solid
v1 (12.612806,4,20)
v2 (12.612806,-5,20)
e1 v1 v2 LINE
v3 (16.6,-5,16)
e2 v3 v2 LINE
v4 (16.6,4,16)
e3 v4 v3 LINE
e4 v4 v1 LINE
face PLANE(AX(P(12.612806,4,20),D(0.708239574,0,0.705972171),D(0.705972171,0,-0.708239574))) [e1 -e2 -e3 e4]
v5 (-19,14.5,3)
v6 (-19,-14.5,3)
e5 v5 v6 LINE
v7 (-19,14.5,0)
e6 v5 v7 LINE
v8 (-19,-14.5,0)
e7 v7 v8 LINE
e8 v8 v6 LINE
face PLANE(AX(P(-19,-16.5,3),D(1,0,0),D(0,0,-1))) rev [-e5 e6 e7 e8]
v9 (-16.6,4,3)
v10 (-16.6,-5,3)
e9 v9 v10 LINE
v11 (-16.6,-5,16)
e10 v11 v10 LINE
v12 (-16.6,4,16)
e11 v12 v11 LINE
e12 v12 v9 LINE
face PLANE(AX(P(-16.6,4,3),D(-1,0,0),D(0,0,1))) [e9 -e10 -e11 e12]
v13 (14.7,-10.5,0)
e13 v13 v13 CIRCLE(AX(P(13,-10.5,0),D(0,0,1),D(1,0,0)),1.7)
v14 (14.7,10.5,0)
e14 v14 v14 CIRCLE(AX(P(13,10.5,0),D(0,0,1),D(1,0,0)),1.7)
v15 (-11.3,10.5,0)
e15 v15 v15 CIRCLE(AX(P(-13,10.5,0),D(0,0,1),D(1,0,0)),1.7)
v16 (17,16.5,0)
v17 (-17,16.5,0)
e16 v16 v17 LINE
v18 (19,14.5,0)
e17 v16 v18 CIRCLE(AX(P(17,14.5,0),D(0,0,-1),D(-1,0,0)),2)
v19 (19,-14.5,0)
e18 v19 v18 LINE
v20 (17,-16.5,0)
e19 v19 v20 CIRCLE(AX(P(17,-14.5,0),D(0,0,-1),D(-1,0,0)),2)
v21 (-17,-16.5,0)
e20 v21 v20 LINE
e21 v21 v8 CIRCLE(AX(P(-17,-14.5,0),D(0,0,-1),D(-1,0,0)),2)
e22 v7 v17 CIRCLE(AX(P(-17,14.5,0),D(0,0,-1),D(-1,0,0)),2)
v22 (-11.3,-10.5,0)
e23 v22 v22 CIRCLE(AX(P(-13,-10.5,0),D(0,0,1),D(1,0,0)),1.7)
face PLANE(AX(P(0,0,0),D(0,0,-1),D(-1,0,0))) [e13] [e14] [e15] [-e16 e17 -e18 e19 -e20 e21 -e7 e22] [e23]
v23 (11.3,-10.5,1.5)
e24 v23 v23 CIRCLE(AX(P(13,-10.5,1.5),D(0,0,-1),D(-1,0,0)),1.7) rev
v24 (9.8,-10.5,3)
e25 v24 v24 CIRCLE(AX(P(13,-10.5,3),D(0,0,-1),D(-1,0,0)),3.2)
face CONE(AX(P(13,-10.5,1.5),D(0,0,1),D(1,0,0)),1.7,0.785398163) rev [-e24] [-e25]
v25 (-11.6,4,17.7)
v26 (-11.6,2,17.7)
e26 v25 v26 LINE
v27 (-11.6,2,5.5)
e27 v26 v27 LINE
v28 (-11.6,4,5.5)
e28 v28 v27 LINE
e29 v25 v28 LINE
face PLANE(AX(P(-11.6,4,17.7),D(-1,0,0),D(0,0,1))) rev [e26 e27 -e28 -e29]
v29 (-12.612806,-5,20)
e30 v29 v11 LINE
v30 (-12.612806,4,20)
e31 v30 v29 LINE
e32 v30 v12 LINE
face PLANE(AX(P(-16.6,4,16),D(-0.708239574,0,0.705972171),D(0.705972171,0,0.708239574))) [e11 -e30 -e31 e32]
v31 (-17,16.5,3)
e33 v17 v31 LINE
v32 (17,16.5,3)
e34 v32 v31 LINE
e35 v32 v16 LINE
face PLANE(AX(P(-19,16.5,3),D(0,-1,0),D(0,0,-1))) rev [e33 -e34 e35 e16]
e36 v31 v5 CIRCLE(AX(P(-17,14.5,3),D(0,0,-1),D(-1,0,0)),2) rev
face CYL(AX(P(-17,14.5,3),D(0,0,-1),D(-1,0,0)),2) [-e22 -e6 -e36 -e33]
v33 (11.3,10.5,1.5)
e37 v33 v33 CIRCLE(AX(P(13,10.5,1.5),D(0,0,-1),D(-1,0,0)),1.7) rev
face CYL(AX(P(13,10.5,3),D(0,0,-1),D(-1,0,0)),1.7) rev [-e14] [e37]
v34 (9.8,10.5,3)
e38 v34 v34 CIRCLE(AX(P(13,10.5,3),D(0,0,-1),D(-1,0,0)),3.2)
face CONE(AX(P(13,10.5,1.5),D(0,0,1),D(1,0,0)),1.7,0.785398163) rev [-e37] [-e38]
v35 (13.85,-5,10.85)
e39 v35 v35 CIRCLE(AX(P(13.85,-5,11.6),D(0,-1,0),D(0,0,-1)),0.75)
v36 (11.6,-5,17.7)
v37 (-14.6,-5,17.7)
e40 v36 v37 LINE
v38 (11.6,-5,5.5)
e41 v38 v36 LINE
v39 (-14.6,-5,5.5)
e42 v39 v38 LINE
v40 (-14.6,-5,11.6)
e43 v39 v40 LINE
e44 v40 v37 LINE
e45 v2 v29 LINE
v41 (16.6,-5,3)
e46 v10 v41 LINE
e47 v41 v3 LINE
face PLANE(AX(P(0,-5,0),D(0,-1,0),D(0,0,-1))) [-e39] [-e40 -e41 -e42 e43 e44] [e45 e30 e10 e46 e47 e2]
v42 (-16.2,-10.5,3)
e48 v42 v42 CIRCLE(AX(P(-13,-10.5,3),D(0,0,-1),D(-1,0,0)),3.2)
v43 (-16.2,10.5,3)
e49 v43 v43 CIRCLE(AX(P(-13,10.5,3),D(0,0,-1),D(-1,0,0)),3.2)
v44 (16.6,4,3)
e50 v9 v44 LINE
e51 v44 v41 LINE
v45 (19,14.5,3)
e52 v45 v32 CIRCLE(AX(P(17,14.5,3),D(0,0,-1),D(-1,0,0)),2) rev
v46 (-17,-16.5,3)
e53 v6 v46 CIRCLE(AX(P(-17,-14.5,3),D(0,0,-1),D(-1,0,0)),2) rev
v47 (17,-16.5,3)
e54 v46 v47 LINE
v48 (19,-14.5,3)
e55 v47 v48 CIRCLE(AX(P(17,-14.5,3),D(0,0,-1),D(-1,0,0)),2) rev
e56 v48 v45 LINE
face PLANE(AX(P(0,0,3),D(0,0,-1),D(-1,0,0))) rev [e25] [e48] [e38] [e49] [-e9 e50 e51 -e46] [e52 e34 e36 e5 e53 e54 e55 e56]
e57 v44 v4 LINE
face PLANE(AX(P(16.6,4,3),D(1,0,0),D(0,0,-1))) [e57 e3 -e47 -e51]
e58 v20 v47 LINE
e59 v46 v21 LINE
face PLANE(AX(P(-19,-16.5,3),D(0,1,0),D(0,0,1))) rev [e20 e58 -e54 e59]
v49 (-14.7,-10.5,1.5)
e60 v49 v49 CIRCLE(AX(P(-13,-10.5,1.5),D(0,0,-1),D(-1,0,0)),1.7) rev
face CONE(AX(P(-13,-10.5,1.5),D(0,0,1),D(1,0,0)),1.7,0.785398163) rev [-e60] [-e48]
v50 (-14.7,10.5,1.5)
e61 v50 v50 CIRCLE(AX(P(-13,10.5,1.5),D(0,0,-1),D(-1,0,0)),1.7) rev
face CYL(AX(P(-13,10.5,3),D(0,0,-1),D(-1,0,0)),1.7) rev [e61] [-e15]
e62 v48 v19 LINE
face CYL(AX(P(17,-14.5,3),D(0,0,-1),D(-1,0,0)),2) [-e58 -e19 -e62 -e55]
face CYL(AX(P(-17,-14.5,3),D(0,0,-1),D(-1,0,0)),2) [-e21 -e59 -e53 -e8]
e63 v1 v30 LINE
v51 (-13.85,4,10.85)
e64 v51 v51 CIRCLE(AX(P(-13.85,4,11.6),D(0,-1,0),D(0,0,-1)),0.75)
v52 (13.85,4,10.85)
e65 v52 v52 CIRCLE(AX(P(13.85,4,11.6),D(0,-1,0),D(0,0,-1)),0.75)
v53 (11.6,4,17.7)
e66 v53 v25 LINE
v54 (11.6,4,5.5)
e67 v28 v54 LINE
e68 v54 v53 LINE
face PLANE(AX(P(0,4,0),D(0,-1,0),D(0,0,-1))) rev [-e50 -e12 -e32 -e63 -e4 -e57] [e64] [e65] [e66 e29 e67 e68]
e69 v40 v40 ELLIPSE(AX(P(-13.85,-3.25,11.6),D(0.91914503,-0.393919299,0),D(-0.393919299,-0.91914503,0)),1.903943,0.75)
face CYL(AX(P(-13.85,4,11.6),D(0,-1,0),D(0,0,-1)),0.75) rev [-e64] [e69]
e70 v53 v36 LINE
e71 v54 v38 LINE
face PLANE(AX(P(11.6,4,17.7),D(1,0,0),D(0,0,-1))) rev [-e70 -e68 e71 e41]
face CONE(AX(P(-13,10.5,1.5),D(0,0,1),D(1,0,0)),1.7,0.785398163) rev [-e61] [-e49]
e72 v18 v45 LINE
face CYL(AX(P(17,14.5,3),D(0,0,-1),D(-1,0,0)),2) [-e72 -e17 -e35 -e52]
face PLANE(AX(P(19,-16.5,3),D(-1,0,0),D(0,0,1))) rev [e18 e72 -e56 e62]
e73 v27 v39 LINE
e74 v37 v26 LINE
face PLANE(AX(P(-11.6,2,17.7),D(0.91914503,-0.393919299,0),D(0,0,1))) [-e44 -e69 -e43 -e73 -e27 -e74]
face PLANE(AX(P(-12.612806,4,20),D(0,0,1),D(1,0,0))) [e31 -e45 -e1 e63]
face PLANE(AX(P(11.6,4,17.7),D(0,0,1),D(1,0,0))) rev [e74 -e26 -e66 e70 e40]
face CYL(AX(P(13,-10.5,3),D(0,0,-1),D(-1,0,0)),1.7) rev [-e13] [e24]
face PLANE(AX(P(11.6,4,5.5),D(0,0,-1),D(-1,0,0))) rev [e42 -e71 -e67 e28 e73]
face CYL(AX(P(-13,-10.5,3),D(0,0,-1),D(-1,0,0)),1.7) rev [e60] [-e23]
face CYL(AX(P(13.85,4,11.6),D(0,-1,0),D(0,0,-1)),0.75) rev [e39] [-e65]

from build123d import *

# Parameters (mm, degrees)
SKETCH1_W                = 38
SKETCH1_H                = 33
SKETCH1_R                = 1.7
BOSS_EXTRUDE1_DEPTH      = 3
BOSS_EXTRUDE2_DEPTH      = 5
BOSS_EXTRUDE2_DEPTH_BACK = 4
SKETCH3_R                = 0.75
SKETCH3_W                = 23.2
SKETCH3_H                = 12.2
FILLET1_R                = 2
CHAMFER1_SIZE            = 1.5
CHAMFER2_SIZE            = 3
CHAMFER2_SIZE_2          = 7


with BuildPart() as part:
    # Sketch1 → Boss-Extrude1 (new body)
    with BuildSketch(Plane.XY):
        Rectangle(SKETCH1_W, SKETCH1_H)
        with Locations((-13, 10.5)):
            Circle(SKETCH1_R, mode=Mode.SUBTRACT)
        with Locations((13, 10.5)):
            Circle(SKETCH1_R, mode=Mode.SUBTRACT)
        with Locations((13, -10.5)):
            Circle(SKETCH1_R, mode=Mode.SUBTRACT)
        with Locations((-13, -10.5)):
            Circle(SKETCH1_R, mode=Mode.SUBTRACT)
    extrude(amount=BOSS_EXTRUDE1_DEPTH)

    # Sketch3 → Boss-Extrude2 (add, two sides: drawn at the far end of the back side and taken through both)
    with BuildSketch(Plane(origin=(0, 0, 0), x_dir=(-1, 0, 0), z_dir=(0, -1, 0)).offset(-BOSS_EXTRUDE2_DEPTH_BACK)):
        Polygon((16.6, -3), (16.6, -16), (12.612805852, -20), (-12.612805852, -20), (-16.6, -16), (-16.6, -3), align=None)
        with Locations(Location((-13.85, -11.6, 0), (0, 0, 90))):
            Circle(SKETCH3_R, mode=Mode.SUBTRACT)
        with Locations(Location((13.85, -11.6, 0), (0, 0, 90))):
            Circle(SKETCH3_R, mode=Mode.SUBTRACT)
        with Locations((0, -11.6)):
            Rectangle(SKETCH3_W, SKETCH3_H, mode=Mode.SUBTRACT)
    extrude(amount=BOSS_EXTRUDE2_DEPTH + BOSS_EXTRUDE2_DEPTH_BACK)

    # Fillet1
    fillet1_edges = [part.edges().sort_by_distance(p)[0] for p in [
        (19, -16.5, 1.5),
        (-19, -16.5, 1.5),
        (-19, 16.5, 1.5),
        (19, 16.5, 1.5),
    ]]
    fillet(fillet1_edges, radius=FILLET1_R)

    # Chamfer1
    chamfer1_edges = [part.edges().sort_by_distance(p)[0] for p in [
        (-14.7, 10.5, 3),
        (11.3, 10.5, 3),
        (11.3, -10.5, 3),
        (-14.7, -10.5, 3),
    ]]
    chamfer(chamfer1_edges, length=CHAMFER1_SIZE)

    # Chamfer2
    # the kernel refuses this chamfer: 7, 3 mm, written as the material it takes off along each edge
    with BuildSketch(Plane(origin=(-11.6, -5, 17.7), x_dir=(-0.9965941369752023, -0.08246287738523173, 0), z_dir=(0, 0, -1))) as chamfer2_piece_1:
        Polygon((CHAMFER2_SIZE * 0.996594136975, CHAMFER2_SIZE * 0.0824628773852), (-CHAMFER2_SIZE_2 * 0.0824628773852, CHAMFER2_SIZE_2 * 0.996594136975), (0, 0), align=None)
    extrude(amount=12.2, mode=Mode.SUBTRACT)


solid = part.part
